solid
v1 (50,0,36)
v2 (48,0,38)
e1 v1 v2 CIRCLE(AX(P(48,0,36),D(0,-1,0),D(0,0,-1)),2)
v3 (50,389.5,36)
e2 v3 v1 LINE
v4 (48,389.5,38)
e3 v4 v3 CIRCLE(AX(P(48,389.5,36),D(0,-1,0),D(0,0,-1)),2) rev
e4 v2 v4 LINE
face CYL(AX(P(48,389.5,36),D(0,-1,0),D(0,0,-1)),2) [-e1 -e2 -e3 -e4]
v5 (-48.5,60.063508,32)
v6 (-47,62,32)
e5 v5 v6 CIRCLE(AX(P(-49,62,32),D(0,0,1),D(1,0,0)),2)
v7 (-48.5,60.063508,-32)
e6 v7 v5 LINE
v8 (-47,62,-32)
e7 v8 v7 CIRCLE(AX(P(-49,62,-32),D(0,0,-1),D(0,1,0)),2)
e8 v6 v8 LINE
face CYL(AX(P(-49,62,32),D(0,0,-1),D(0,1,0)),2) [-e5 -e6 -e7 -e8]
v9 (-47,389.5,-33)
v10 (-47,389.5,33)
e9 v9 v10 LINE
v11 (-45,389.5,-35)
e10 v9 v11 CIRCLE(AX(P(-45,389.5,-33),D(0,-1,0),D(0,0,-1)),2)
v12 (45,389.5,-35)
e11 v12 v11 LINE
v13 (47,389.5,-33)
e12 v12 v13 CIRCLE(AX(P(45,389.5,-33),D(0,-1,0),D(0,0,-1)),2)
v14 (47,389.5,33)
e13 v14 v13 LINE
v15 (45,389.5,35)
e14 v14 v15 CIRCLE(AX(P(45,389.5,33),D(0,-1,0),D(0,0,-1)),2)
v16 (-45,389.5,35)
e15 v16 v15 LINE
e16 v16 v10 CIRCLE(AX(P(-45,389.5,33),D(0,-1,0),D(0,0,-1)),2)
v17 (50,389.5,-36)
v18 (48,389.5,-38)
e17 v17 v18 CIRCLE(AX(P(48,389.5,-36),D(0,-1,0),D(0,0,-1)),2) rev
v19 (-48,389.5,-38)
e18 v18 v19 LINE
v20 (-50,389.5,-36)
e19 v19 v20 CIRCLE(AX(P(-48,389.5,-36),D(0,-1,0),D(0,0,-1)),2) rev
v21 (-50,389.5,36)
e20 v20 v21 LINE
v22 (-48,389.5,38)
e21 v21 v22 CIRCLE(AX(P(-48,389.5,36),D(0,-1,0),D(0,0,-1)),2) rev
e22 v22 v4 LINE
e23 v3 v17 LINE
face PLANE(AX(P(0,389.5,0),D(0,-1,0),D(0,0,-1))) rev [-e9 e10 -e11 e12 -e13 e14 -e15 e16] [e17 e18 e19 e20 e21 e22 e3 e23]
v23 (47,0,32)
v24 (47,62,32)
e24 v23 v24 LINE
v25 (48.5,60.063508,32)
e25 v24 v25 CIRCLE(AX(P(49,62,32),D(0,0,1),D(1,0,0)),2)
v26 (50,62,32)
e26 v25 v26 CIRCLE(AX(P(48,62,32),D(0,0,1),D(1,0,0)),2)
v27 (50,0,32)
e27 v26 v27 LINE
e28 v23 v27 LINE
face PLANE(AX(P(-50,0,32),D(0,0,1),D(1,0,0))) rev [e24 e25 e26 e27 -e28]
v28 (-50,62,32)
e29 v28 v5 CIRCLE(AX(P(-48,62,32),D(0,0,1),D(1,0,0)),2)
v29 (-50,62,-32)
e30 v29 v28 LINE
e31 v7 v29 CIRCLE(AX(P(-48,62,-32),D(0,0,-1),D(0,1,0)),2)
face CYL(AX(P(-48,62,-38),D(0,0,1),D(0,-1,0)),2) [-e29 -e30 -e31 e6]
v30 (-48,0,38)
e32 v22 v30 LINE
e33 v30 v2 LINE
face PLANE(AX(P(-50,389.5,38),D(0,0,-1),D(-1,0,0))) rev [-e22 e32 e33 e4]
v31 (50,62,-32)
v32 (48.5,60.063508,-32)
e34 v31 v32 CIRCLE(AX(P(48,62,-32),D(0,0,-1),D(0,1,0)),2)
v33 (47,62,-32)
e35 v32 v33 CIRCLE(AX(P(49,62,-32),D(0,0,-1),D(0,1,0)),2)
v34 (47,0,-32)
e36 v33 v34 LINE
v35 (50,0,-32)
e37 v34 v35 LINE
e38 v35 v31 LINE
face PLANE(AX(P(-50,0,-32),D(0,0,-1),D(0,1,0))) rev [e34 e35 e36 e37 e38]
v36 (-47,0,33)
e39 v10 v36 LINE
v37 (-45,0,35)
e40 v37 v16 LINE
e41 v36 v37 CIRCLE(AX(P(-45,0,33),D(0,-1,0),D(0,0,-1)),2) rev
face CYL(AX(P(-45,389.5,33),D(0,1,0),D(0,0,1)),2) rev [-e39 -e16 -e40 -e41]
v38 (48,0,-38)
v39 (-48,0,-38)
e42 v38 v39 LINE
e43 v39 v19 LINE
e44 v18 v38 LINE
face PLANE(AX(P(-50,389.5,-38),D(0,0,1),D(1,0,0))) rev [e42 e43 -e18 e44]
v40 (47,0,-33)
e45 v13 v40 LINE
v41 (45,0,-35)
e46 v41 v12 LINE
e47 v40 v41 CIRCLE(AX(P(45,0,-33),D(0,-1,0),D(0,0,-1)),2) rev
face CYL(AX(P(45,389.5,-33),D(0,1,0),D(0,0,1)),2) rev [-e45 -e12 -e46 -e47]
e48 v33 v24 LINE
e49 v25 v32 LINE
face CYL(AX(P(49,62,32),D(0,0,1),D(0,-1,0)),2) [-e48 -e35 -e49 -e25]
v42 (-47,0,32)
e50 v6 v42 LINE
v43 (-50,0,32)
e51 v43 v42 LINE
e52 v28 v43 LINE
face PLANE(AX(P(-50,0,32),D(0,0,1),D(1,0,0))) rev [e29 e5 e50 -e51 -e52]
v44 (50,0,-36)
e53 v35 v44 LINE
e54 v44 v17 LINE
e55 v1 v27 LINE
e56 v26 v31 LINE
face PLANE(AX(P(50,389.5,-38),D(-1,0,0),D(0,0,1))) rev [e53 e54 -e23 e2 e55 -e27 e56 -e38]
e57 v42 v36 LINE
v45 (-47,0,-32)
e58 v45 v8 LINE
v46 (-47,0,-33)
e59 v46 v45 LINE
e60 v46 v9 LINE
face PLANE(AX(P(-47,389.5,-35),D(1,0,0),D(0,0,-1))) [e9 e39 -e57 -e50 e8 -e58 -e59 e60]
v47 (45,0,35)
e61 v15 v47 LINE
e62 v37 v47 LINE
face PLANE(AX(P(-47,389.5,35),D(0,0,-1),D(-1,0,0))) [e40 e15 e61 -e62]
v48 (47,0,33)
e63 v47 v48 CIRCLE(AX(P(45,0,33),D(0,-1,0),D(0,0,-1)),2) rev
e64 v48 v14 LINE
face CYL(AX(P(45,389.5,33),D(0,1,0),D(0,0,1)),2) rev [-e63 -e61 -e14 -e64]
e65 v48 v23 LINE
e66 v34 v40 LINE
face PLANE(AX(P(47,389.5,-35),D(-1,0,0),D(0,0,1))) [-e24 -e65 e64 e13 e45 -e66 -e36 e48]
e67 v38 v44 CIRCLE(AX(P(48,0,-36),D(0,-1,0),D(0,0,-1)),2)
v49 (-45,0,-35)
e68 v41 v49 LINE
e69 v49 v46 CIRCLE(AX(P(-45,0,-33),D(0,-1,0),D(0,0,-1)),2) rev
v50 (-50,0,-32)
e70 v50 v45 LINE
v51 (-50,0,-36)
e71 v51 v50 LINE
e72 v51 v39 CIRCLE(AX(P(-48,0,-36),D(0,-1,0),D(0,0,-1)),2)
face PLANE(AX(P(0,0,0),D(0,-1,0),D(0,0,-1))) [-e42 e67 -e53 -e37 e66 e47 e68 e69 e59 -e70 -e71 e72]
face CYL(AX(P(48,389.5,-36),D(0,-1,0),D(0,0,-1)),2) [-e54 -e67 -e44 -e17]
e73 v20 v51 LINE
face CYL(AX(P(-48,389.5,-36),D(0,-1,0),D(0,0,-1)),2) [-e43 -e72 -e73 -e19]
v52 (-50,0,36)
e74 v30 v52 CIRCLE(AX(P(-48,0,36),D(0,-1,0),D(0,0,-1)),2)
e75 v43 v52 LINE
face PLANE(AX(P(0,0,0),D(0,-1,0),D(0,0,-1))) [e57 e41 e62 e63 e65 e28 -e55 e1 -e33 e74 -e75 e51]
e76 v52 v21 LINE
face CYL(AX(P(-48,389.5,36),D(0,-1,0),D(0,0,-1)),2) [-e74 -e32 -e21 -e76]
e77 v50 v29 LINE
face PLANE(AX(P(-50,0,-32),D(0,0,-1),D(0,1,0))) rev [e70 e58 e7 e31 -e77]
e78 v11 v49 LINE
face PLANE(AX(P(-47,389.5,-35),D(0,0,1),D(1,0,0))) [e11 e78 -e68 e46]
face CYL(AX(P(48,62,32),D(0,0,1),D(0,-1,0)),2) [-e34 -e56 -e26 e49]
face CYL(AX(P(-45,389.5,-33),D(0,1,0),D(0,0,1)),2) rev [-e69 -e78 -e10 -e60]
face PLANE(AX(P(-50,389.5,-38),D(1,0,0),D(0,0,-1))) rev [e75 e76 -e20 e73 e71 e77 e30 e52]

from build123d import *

# Parameters (mm, degrees)
SKETCH1_W               = 100
SKETCH1_H               = 76
SKETCH1_W_2             = 94
SKETCH1_H_2             = 70
BOSS_EXTRUDE1_DEPTH     = 389.5
CUT_EXTRUDE1_DEPTH      = 395.530417078
CUT_EXTRUDE1_DEPTH_BACK = 395.530417078
SKETCH4_W               = 64
SKETCH4_H               = 60
FILLET1_R               = 2


with BuildPart() as part:
    # Sketch1 → Boss-Extrude1 (new body)
    with BuildSketch(Plane(origin=(0, 0, 0), x_dir=(1, 0, 0), z_dir=(0, 1, 0))):
        Rectangle(SKETCH1_W, SKETCH1_H)
        Rectangle(SKETCH1_W_2, SKETCH1_H_2, mode=Mode.SUBTRACT)
    extrude(amount=BOSS_EXTRUDE1_DEPTH)

    # Sketch4 → Cut-Extrude1 (cut, two sides: drawn at the far end of the back side and taken through both)
    with BuildSketch(Plane(origin=(0, 0, 0), x_dir=(0, 0, -1), z_dir=(1, 0, 0)).offset(-CUT_EXTRUDE1_DEPTH_BACK)):
        with Locations((0, 30)):
            Rectangle(SKETCH4_W, SKETCH4_H)
    extrude(amount=CUT_EXTRUDE1_DEPTH + CUT_EXTRUDE1_DEPTH_BACK, mode=Mode.SUBTRACT)

    # Fillet1
    # the kernel refuses this fillet: 2 mm, written as the material it adds along each edge
    with BuildSketch(Plane(origin=(47, 0, 35), x_dir=(0, 0, -1), z_dir=(0, 1, 0))) as fillet1_piece_1:
        with BuildLine():
            CenterArc((FILLET1_R, FILLET1_R), FILLET1_R, 180, 90)
            Line((0, FILLET1_R), (0, 0))
            Line((0, 0), (FILLET1_R, 0))
        make_face()
    extrude(amount=389.5)
    with BuildSketch(Plane(origin=(-47, 0, 35), x_dir=(0, 0, -1), z_dir=(0, 1, 0)), Plane(origin=(47, 0, -35), x_dir=(0, 0, 1), z_dir=(0, 1, 0)), Plane(origin=(-47, 0, -35), x_dir=(1, 0, 0), z_dir=(0, 1, 0))) as fillet1_piece_2:
        with BuildLine():
            CenterArc((FILLET1_R, -FILLET1_R), FILLET1_R, 90, 90)
            Line((0, -FILLET1_R), (0, 0))
            Line((0, 0), (FILLET1_R, 0))
        make_face()
    extrude(amount=389.5)
    # the kernel refuses this fillet: 2 mm, written as the material it takes off along each edge
    with BuildSketch(Plane(origin=(50, -5, -38), x_dir=(-1, 0, 0), z_dir=(0, 1, 0)), Plane(origin=(-50, -5, -38), x_dir=(0, 0, 1), z_dir=(0, 1, 0))) as fillet1_2_piece_1:
        with BuildLine():
            CenterArc((FILLET1_R, FILLET1_R), FILLET1_R, 180, 90)
            Line((0, FILLET1_R), (0, 0))
            Line((0, 0), (FILLET1_R, 0))
        make_face()
    extrude(amount=399.5, mode=Mode.SUBTRACT)
    with BuildSketch(Plane(origin=(-50, -5, 38), x_dir=(0, 0, -1), z_dir=(0, 1, 0)), Plane(origin=(50, -5, 38), x_dir=(-1, 0, 0), z_dir=(0, 1, 0))) as fillet1_2_piece_2:
        with BuildLine():
            CenterArc((FILLET1_R, -FILLET1_R), FILLET1_R, 90, 90)
            Line((0, -FILLET1_R), (0, 0))
            Line((0, 0), (FILLET1_R, 0))
        make_face()
    extrude(amount=399.5, mode=Mode.SUBTRACT)
    with BuildSketch(Plane(origin=(-50, 60, 32), x_dir=(0, 1, 0), z_dir=(0, 0, -1)), Plane(origin=(50, 60, -32), x_dir=(0, 1, 0), z_dir=(0, 0, 1)), Plane(origin=(47, 60, 32), x_dir=(0, 1, 0), z_dir=(0, 0, -1))) as fillet1_2_piece_3:
        with BuildLine():
            CenterArc((FILLET1_R, FILLET1_R), FILLET1_R, 180, 90)
            Line((0, FILLET1_R), (0, 0))
            Line((0, 0), (FILLET1_R, 0))
        make_face()
    extrude(amount=64, mode=Mode.SUBTRACT)
    with BuildSketch(Plane(origin=(-47, 60, -32), x_dir=(-1, 0, 0), z_dir=(0, 0, 1))) as fillet1_2_piece_4:
        with BuildLine():
            CenterArc((FILLET1_R, -FILLET1_R), FILLET1_R, 90, 90)
            Line((0, -FILLET1_R), (0, 0))
            Line((0, 0), (FILLET1_R, 0))
        make_face()
    extrude(amount=64, mode=Mode.SUBTRACT)


solid = part.part
